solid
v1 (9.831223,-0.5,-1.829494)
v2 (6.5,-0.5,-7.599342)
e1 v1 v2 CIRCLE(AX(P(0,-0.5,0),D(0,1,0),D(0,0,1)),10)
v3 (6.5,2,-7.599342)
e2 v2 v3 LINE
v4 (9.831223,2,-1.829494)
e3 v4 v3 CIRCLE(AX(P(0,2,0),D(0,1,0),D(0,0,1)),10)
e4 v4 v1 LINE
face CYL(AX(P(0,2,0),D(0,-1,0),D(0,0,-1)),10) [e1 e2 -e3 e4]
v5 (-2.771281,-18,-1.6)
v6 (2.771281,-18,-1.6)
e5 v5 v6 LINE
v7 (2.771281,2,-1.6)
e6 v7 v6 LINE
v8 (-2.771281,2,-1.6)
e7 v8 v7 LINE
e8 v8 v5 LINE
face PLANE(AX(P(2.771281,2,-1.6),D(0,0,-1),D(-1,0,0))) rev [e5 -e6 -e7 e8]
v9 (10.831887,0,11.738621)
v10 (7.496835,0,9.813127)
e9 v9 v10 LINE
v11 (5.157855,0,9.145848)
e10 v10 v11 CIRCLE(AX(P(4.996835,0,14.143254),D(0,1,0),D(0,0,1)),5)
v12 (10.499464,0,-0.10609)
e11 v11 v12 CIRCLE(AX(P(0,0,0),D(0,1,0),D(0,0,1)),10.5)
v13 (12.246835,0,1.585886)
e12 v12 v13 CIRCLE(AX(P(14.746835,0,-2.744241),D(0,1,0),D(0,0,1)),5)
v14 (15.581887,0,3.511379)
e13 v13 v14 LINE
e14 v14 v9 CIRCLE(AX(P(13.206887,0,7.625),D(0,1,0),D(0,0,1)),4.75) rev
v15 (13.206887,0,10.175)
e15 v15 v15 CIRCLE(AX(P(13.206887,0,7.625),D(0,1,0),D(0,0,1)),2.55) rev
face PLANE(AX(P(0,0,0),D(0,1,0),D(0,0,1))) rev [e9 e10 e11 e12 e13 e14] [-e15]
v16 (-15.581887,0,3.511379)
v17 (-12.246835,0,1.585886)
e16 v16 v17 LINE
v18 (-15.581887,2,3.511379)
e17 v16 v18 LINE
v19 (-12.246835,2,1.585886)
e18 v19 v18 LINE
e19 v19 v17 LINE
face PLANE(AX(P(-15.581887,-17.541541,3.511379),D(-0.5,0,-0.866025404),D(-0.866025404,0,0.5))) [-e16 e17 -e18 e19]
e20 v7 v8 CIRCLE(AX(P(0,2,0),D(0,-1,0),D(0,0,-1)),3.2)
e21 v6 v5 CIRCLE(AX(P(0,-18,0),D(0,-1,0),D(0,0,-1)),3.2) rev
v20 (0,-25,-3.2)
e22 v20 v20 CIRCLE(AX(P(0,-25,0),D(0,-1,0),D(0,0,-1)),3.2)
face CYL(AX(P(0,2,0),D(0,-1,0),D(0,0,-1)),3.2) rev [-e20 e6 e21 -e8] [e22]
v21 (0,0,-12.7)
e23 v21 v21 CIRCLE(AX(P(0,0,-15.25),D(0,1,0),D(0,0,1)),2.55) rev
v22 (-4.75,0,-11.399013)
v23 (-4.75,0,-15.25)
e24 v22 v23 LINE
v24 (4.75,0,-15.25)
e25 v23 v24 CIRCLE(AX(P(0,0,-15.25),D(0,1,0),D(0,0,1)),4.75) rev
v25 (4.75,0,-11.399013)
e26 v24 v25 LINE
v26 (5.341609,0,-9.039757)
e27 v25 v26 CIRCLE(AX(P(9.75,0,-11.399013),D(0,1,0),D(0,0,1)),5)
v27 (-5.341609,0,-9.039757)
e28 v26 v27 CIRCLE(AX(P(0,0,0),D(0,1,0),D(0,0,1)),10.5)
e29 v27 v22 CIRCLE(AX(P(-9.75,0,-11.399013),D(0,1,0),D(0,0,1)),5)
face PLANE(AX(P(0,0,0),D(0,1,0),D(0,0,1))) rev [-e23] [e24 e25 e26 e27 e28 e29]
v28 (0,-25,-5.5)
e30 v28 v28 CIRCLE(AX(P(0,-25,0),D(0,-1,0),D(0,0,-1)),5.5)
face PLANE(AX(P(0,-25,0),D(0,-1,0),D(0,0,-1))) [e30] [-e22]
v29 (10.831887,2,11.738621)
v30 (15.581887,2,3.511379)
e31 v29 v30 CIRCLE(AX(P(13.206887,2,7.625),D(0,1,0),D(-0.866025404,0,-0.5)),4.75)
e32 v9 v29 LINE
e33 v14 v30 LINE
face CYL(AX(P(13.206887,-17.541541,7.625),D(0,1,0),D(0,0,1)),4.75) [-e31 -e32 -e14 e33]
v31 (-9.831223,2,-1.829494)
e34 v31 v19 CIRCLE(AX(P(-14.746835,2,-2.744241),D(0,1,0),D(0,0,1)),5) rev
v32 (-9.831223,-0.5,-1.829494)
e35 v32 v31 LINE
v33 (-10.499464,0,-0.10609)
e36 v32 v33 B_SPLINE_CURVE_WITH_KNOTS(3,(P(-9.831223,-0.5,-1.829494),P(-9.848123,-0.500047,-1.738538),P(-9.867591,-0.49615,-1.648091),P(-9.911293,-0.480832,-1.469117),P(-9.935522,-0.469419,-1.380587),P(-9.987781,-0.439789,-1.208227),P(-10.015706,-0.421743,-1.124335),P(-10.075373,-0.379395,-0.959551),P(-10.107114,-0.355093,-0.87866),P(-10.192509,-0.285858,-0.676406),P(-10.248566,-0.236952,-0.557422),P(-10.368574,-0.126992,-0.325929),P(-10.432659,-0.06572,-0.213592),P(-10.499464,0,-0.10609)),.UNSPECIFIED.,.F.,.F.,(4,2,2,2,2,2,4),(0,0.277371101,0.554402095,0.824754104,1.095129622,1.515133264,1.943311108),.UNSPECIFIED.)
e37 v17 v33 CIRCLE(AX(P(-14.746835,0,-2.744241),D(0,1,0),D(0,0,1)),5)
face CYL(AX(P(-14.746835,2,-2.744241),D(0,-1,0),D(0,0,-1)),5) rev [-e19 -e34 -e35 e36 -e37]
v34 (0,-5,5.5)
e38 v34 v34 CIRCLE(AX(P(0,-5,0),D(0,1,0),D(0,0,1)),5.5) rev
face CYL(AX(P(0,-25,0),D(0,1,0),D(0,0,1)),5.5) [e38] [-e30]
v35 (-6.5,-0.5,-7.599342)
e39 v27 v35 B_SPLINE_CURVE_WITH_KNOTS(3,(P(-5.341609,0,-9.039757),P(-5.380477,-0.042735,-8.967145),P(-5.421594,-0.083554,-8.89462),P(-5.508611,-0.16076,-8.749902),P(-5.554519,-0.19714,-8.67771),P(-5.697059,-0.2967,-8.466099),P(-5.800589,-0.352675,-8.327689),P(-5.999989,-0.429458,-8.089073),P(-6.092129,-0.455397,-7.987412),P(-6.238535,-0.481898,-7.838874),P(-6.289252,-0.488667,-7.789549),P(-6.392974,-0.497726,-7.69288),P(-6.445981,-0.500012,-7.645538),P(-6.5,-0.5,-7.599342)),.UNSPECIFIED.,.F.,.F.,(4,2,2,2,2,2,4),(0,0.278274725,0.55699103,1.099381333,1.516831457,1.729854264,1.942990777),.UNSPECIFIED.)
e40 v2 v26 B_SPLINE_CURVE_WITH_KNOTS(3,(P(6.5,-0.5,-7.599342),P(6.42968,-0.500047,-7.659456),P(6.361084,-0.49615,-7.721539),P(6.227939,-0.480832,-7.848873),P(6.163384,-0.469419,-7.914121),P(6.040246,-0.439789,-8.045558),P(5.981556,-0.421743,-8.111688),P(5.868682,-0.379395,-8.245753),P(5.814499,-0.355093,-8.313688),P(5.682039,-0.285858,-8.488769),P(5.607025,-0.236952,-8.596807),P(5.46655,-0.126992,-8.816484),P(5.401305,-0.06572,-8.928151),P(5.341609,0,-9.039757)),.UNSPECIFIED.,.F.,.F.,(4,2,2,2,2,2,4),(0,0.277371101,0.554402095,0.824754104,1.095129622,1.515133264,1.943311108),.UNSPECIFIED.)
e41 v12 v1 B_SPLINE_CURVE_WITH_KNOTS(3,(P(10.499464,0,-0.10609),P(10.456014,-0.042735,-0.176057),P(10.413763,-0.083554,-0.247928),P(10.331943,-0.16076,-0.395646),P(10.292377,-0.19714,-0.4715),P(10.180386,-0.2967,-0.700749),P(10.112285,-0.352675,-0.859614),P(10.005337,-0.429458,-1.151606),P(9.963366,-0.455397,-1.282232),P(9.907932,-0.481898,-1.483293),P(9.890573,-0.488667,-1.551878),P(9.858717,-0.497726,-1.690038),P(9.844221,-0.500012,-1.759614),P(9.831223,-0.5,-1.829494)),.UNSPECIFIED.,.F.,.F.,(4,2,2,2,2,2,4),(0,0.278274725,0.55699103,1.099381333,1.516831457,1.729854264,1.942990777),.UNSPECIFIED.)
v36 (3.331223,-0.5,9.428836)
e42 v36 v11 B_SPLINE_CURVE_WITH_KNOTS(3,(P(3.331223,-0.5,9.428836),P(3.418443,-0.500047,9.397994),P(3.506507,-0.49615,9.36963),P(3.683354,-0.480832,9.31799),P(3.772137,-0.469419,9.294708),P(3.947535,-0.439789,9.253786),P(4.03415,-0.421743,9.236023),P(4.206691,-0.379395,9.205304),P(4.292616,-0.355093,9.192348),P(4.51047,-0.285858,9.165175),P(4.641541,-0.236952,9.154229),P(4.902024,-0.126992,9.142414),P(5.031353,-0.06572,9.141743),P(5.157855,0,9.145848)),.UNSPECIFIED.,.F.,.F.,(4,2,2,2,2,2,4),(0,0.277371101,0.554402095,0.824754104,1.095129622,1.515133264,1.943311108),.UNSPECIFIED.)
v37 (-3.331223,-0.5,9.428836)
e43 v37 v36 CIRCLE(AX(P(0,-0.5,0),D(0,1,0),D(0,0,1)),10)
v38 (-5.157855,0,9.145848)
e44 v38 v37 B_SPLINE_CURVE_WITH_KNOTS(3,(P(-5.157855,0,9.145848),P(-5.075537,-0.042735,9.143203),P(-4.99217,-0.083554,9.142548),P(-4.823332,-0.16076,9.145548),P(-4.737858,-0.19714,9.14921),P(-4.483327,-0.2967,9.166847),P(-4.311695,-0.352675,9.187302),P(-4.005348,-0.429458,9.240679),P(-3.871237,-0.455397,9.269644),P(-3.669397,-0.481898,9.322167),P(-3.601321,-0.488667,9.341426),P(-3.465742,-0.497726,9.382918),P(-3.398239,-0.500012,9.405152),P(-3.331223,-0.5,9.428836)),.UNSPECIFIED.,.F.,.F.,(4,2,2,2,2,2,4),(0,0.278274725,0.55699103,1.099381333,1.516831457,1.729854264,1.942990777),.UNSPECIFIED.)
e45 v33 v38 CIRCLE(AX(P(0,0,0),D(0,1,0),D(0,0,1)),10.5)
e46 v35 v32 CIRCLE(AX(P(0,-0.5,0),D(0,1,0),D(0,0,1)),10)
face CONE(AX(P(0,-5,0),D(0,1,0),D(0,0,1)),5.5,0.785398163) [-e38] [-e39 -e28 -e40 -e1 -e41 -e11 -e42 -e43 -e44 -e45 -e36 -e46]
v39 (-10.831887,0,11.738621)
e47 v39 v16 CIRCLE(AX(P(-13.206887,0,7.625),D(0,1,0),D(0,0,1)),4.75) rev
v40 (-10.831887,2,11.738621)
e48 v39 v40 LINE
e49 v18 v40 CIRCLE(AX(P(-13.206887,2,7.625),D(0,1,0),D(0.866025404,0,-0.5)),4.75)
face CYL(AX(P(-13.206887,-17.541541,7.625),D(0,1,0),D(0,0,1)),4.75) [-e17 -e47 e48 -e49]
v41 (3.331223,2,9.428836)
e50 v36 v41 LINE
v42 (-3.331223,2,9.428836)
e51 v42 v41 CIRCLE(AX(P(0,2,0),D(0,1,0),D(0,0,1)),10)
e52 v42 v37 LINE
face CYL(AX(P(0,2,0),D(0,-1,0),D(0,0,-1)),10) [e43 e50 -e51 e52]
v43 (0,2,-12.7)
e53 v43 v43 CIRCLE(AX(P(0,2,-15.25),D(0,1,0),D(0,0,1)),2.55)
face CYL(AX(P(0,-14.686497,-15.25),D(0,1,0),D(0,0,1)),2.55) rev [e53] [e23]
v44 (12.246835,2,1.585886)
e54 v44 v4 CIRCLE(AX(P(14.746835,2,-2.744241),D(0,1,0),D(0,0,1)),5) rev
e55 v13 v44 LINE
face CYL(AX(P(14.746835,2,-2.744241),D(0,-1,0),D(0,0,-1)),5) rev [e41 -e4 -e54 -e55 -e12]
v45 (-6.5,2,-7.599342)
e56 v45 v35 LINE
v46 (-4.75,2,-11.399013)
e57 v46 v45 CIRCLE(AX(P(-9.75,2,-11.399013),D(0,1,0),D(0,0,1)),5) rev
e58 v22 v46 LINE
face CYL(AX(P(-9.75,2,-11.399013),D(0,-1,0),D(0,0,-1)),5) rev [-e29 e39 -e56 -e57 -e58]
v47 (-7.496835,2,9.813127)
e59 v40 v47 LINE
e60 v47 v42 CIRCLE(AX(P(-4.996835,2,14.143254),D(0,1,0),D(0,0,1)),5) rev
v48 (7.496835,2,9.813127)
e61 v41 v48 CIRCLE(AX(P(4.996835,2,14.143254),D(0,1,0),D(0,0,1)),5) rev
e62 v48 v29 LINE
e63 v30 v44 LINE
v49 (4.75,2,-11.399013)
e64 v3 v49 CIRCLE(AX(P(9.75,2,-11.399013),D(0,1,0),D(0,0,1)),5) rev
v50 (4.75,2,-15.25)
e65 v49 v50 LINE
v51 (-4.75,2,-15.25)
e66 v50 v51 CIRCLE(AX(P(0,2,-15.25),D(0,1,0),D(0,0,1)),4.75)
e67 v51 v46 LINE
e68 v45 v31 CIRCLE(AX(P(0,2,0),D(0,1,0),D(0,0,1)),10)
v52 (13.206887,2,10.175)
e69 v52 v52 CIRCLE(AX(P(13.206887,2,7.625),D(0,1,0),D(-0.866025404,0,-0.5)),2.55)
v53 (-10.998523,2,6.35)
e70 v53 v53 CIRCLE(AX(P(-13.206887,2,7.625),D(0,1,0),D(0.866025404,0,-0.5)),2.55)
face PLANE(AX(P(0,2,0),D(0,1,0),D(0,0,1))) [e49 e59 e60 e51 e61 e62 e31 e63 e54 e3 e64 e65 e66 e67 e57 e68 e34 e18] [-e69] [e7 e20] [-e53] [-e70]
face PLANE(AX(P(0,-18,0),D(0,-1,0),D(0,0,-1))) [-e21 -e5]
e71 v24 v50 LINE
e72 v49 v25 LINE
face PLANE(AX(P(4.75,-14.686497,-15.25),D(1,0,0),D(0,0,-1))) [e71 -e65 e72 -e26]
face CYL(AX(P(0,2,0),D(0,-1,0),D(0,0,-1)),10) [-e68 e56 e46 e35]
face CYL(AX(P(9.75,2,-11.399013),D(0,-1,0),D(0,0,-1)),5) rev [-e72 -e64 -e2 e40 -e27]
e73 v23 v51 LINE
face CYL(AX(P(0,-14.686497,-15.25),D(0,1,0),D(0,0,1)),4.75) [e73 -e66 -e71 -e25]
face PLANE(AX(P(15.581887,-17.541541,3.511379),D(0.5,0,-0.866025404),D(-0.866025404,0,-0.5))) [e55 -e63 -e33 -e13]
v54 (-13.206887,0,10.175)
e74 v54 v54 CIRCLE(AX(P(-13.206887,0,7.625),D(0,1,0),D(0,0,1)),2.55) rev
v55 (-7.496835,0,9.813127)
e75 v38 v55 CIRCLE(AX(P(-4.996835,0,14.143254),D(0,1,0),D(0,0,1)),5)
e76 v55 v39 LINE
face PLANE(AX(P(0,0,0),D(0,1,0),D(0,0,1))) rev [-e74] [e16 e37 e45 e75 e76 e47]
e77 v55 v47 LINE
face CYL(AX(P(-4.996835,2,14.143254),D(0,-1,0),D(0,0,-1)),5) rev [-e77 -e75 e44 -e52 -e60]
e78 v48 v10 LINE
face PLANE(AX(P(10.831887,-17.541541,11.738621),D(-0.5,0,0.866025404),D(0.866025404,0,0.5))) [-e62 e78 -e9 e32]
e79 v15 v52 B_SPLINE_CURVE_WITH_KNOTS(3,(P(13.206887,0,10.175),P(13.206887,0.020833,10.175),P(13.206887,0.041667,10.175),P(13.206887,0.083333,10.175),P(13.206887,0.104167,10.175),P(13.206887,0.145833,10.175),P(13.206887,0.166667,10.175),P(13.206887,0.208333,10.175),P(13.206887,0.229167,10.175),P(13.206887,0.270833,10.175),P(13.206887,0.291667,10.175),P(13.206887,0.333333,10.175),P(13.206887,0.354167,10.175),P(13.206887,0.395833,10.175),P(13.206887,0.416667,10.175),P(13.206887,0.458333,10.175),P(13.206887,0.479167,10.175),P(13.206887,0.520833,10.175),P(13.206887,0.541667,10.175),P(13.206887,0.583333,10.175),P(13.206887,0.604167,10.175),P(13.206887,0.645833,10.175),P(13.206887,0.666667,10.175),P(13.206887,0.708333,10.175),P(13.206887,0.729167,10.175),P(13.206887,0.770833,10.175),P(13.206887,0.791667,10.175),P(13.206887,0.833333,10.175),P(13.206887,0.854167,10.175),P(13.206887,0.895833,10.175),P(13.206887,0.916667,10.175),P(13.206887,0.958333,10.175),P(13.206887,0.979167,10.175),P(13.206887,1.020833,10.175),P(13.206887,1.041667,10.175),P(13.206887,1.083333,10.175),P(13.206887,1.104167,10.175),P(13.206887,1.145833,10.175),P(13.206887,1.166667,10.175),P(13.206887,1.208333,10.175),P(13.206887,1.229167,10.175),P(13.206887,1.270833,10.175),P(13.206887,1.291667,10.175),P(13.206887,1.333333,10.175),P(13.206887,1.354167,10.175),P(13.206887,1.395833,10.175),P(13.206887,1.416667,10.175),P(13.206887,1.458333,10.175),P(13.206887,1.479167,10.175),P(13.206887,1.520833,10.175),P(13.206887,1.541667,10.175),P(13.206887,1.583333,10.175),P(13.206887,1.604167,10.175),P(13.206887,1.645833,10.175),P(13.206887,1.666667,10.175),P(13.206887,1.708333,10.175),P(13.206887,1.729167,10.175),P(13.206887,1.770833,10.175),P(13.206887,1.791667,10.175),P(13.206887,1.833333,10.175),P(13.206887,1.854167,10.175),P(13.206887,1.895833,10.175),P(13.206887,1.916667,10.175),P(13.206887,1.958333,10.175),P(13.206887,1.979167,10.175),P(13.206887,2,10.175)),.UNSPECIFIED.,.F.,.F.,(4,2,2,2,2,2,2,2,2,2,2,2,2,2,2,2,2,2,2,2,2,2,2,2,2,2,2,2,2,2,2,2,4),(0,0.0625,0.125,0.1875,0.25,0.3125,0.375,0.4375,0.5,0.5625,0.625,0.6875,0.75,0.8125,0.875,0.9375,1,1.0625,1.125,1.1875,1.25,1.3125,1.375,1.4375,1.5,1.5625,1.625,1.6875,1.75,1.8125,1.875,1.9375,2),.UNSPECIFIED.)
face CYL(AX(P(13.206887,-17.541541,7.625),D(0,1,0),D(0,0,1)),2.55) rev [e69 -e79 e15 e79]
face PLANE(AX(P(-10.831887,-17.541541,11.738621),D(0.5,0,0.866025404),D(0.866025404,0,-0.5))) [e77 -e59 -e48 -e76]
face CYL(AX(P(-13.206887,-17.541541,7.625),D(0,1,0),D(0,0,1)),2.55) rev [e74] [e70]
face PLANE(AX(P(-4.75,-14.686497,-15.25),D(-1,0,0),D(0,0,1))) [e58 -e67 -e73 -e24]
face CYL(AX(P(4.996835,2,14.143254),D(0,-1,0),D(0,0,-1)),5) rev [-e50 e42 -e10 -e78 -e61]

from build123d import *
from build123d.topology import SkipClean

# Parameters (mm, degrees)
SKETCH1_R               = 10
BOSS_EXTRUDE1_DEPTH     = 2
BOSS_EXTRUDE2_START     = -2
SKETCH2_R               = 2.55
BOSS_EXTRUDE2_DEPTH     = 2
CIRPATTERN1_COUNT       = 3
CUT_EXTRUDE1_DEPTH      = 27.9527328
SKETCH4_R               = 5.5
BOSS_EXTRUDE3_DEPTH     = 25
CUT_EXTRUDE2_START      = -7
SKETCH5_R               = 3
CUT_EXTRUDE2_DEPTH      = 7
CUT_EXTRUDE3_DEPTH      = 34.502982037
CUT_EXTRUDE3_DEPTH_BACK = 34.502982037
CUT_EXTRUDE4_START      = -7
SKETCH8_R               = 3.2
CUT_EXTRUDE4_DEPTH      = 7
FILLET2_R               = 5
CHAMFER1_START          = -2
CHAMFER1_2_DEPTH        = 2


with BuildPart() as part:
    # Sketch1 → Boss-Extrude1 (new body)
    with BuildSketch(Plane(origin=(0, 0, 0), x_dir=(1, 0, 0), z_dir=(0, 1, 0))):
        with Locations(Location((0, 0, 0), (0, 0, 270))):
            Circle(SKETCH1_R)
    extrude(amount=BOSS_EXTRUDE1_DEPTH)

    # Sketch2 → Boss-Extrude2 (add)
    with BuildSketch(Plane(origin=(0, 2, 0), x_dir=(1, 0, 0), z_dir=(0, 1, 0)).offset(BOSS_EXTRUDE2_START)):
        with BuildLine():
            Line((-4.75, 15.25), (-4.75, 8.799857953))
            ThreePointArc((-4.75, 8.799857953), (0, 10), (4.75, 8.799857953))
            Line((4.75, 8.799857953), (4.75, 15.25))
            ThreePointArc((4.75, 15.25), (0, 20), (-4.75, 15.25))
        make_face()
        with Locations(Location((0, 15.25, 0), (0, 0, 270))):
            Circle(SKETCH2_R, mode=Mode.SUBTRACT)
    boss_extrude2 = extrude(amount=BOSS_EXTRUDE2_DEPTH)

    # CirPattern1: Boss-Extrude2 ×3 about axis
    cirpattern1_axis = Axis((0, 0, 0), (0, 1, 0))
    for i in range(1, CIRPATTERN1_COUNT):
        add(boss_extrude2.rotate(cirpattern1_axis, i * 360 / CIRPATTERN1_COUNT))

    # Sketch3 → Cut-Extrude1 (cut, through all)
    with BuildSketch(Plane(origin=(0, 2, 0), x_dir=(1, 0, 0), z_dir=(0, 1, 0))):
        with BuildLine():
            Line((-2.653299832, 1.4), (2.653299832, 1.4))
            ThreePointArc((2.653299832, 1.4), (0, -3), (-2.653299832, 1.4))
        make_face()
    extrude(amount=-CUT_EXTRUDE1_DEPTH, mode=Mode.SUBTRACT)

    # Sketch4 → Boss-Extrude3 (add)
    with SkipClean():  # the faces are left unmerged after this step: merging them gives an invalid solid
        with BuildSketch(Plane.XZ):
            with Locations(Location((0, 0, 0), (0, 0, 90))):
                Circle(SKETCH4_R)
            with BuildLine():
                Line((2.653299832, -1.4), (-2.653299832, -1.4))
                ThreePointArc((-2.653299832, -1.4), (0, 3), (2.653299832, -1.4))
            make_face(mode=Mode.SUBTRACT)
        extrude(amount=BOSS_EXTRUDE3_DEPTH)

    # Sketch5 → Cut-Extrude2 (cut)
    with SkipClean():  # the faces are left unmerged after this step: merging them gives an invalid solid
        with BuildSketch(Plane.XZ.offset(25).offset(CUT_EXTRUDE2_START)):
            with Locations(Location((0, 0, 0), (0, 0, 332.181860715))):
                Circle(SKETCH5_R)
        extrude(amount=CUT_EXTRUDE2_DEPTH, mode=Mode.SUBTRACT)

    # Sketch7 → Cut-Extrude3 (cut, two sides: drawn at the far end of the back side and taken through both)
    with BuildSketch(Plane.XZ.offset(18).offset(-CUT_EXTRUDE3_DEPTH_BACK)):
        with BuildLine():
            Line((2.771281292, -1.6), (-2.771281292, -1.6))
            ThreePointArc((-2.771281292, -1.6), (0, 3.2), (2.771281292, -1.6))
        make_face()
        with BuildLine():
            Line((2.653299832, -1.4), (-2.653299832, -1.4))
            ThreePointArc((-2.653299832, -1.4), (0, 3), (2.653299832, -1.4))
        make_face(mode=Mode.SUBTRACT)
    extrude(amount=CUT_EXTRUDE3_DEPTH + CUT_EXTRUDE3_DEPTH_BACK, mode=Mode.SUBTRACT)

    # Sketch8 → Cut-Extrude4 (cut)
    with BuildSketch(Plane.XZ.offset(25).offset(CUT_EXTRUDE4_START)):
        with Locations(Location((0, 0, 0), (0, 0, 270))):
            Circle(SKETCH8_R)
    extrude(amount=CUT_EXTRUDE4_DEPTH, mode=Mode.SUBTRACT)

    # Fillet2
    fillet2_edges = [part.edges().sort_by_distance(p)[0] for p in [
        (9.995900537, 1, 0.286308309),
        (5.245900537, 1, 8.513549645),
        (-5.245900537, 1, 8.513549645),
        (-9.995900537, 1, 0.286308309),
        (-4.75, 1, -8.799857953),
        (4.75, 1, -8.799857953),
    ]]
    fillet(fillet2_edges, radius=FILLET2_R)

    # Chamfer1: read off the stored shape, not the designer's step
    # Chamfer1 outline → Chamfer1 (revolve)
    with BuildSketch(Plane.XY):
        Polygon((5.5, 0), (5.5, -5), (10.5, 0), align=None)
    revolve(axis=Axis((0, 0, 0), (0, 1, 0)))

    # Chamfer1 2 outline → Chamfer1 2 (cut)
    with BuildSketch(Plane(origin=(0, 0, 0), x_dir=(1, 0, 0), z_dir=(0, 1, 0)).offset(CHAMFER1_START)):
        with BuildLine():
            ThreePointArc((7.496834936, -9.813127226), (5.456150608, -9.164396031), (3.331223291, -9.428836163))
            ThreePointArc((3.331223291, -9.428836163), (0, -10), (-3.331223291, -9.428836163))
            ThreePointArc((-3.331223291, -9.428836163), (-5.456150608, -9.164396031), (-7.496834936, -9.813127226))
            Line((-7.496834936, -9.813127226), (-11.28460969, -12))
            Line((-11.28460969, -12), (11.28460969, -12))
            Line((11.28460969, -12), (7.496834936, -9.813127226))
        make_face()
        with BuildLine():
            ThreePointArc((9.831223291, 1.829494086), (10.582663547, -0.023370954), (12, -1.433664786))
            Line((12, -1.433664786), (12, 11))
            Line((12, 11), (4.765946576, 11))
            ThreePointArc((4.765946576, 11), (5.295673168, 9.12767596), (6.5, 7.599342077))
            ThreePointArc((6.5, 7.599342077), (8.660254038, 5), (9.831223291, 1.829494086))
        make_face()
        with BuildLine():
            Line((-12, 11), (-12, -1.433664786))
            ThreePointArc((-12, -1.433664786), (-10.582663547, -0.023370954), (-9.831223291, 1.829494086))
            ThreePointArc((-9.831223291, 1.829494086), (-8.660254038, 5), (-6.5, 7.599342077))
            ThreePointArc((-6.5, 7.599342077), (-5.295673168, 9.12767596), (-4.765946576, 11))
            Line((-4.765946576, 11), (-12, 11))
        make_face()
    extrude(amount=CHAMFER1_2_DEPTH, mode=Mode.SUBTRACT)


solid = part.part
